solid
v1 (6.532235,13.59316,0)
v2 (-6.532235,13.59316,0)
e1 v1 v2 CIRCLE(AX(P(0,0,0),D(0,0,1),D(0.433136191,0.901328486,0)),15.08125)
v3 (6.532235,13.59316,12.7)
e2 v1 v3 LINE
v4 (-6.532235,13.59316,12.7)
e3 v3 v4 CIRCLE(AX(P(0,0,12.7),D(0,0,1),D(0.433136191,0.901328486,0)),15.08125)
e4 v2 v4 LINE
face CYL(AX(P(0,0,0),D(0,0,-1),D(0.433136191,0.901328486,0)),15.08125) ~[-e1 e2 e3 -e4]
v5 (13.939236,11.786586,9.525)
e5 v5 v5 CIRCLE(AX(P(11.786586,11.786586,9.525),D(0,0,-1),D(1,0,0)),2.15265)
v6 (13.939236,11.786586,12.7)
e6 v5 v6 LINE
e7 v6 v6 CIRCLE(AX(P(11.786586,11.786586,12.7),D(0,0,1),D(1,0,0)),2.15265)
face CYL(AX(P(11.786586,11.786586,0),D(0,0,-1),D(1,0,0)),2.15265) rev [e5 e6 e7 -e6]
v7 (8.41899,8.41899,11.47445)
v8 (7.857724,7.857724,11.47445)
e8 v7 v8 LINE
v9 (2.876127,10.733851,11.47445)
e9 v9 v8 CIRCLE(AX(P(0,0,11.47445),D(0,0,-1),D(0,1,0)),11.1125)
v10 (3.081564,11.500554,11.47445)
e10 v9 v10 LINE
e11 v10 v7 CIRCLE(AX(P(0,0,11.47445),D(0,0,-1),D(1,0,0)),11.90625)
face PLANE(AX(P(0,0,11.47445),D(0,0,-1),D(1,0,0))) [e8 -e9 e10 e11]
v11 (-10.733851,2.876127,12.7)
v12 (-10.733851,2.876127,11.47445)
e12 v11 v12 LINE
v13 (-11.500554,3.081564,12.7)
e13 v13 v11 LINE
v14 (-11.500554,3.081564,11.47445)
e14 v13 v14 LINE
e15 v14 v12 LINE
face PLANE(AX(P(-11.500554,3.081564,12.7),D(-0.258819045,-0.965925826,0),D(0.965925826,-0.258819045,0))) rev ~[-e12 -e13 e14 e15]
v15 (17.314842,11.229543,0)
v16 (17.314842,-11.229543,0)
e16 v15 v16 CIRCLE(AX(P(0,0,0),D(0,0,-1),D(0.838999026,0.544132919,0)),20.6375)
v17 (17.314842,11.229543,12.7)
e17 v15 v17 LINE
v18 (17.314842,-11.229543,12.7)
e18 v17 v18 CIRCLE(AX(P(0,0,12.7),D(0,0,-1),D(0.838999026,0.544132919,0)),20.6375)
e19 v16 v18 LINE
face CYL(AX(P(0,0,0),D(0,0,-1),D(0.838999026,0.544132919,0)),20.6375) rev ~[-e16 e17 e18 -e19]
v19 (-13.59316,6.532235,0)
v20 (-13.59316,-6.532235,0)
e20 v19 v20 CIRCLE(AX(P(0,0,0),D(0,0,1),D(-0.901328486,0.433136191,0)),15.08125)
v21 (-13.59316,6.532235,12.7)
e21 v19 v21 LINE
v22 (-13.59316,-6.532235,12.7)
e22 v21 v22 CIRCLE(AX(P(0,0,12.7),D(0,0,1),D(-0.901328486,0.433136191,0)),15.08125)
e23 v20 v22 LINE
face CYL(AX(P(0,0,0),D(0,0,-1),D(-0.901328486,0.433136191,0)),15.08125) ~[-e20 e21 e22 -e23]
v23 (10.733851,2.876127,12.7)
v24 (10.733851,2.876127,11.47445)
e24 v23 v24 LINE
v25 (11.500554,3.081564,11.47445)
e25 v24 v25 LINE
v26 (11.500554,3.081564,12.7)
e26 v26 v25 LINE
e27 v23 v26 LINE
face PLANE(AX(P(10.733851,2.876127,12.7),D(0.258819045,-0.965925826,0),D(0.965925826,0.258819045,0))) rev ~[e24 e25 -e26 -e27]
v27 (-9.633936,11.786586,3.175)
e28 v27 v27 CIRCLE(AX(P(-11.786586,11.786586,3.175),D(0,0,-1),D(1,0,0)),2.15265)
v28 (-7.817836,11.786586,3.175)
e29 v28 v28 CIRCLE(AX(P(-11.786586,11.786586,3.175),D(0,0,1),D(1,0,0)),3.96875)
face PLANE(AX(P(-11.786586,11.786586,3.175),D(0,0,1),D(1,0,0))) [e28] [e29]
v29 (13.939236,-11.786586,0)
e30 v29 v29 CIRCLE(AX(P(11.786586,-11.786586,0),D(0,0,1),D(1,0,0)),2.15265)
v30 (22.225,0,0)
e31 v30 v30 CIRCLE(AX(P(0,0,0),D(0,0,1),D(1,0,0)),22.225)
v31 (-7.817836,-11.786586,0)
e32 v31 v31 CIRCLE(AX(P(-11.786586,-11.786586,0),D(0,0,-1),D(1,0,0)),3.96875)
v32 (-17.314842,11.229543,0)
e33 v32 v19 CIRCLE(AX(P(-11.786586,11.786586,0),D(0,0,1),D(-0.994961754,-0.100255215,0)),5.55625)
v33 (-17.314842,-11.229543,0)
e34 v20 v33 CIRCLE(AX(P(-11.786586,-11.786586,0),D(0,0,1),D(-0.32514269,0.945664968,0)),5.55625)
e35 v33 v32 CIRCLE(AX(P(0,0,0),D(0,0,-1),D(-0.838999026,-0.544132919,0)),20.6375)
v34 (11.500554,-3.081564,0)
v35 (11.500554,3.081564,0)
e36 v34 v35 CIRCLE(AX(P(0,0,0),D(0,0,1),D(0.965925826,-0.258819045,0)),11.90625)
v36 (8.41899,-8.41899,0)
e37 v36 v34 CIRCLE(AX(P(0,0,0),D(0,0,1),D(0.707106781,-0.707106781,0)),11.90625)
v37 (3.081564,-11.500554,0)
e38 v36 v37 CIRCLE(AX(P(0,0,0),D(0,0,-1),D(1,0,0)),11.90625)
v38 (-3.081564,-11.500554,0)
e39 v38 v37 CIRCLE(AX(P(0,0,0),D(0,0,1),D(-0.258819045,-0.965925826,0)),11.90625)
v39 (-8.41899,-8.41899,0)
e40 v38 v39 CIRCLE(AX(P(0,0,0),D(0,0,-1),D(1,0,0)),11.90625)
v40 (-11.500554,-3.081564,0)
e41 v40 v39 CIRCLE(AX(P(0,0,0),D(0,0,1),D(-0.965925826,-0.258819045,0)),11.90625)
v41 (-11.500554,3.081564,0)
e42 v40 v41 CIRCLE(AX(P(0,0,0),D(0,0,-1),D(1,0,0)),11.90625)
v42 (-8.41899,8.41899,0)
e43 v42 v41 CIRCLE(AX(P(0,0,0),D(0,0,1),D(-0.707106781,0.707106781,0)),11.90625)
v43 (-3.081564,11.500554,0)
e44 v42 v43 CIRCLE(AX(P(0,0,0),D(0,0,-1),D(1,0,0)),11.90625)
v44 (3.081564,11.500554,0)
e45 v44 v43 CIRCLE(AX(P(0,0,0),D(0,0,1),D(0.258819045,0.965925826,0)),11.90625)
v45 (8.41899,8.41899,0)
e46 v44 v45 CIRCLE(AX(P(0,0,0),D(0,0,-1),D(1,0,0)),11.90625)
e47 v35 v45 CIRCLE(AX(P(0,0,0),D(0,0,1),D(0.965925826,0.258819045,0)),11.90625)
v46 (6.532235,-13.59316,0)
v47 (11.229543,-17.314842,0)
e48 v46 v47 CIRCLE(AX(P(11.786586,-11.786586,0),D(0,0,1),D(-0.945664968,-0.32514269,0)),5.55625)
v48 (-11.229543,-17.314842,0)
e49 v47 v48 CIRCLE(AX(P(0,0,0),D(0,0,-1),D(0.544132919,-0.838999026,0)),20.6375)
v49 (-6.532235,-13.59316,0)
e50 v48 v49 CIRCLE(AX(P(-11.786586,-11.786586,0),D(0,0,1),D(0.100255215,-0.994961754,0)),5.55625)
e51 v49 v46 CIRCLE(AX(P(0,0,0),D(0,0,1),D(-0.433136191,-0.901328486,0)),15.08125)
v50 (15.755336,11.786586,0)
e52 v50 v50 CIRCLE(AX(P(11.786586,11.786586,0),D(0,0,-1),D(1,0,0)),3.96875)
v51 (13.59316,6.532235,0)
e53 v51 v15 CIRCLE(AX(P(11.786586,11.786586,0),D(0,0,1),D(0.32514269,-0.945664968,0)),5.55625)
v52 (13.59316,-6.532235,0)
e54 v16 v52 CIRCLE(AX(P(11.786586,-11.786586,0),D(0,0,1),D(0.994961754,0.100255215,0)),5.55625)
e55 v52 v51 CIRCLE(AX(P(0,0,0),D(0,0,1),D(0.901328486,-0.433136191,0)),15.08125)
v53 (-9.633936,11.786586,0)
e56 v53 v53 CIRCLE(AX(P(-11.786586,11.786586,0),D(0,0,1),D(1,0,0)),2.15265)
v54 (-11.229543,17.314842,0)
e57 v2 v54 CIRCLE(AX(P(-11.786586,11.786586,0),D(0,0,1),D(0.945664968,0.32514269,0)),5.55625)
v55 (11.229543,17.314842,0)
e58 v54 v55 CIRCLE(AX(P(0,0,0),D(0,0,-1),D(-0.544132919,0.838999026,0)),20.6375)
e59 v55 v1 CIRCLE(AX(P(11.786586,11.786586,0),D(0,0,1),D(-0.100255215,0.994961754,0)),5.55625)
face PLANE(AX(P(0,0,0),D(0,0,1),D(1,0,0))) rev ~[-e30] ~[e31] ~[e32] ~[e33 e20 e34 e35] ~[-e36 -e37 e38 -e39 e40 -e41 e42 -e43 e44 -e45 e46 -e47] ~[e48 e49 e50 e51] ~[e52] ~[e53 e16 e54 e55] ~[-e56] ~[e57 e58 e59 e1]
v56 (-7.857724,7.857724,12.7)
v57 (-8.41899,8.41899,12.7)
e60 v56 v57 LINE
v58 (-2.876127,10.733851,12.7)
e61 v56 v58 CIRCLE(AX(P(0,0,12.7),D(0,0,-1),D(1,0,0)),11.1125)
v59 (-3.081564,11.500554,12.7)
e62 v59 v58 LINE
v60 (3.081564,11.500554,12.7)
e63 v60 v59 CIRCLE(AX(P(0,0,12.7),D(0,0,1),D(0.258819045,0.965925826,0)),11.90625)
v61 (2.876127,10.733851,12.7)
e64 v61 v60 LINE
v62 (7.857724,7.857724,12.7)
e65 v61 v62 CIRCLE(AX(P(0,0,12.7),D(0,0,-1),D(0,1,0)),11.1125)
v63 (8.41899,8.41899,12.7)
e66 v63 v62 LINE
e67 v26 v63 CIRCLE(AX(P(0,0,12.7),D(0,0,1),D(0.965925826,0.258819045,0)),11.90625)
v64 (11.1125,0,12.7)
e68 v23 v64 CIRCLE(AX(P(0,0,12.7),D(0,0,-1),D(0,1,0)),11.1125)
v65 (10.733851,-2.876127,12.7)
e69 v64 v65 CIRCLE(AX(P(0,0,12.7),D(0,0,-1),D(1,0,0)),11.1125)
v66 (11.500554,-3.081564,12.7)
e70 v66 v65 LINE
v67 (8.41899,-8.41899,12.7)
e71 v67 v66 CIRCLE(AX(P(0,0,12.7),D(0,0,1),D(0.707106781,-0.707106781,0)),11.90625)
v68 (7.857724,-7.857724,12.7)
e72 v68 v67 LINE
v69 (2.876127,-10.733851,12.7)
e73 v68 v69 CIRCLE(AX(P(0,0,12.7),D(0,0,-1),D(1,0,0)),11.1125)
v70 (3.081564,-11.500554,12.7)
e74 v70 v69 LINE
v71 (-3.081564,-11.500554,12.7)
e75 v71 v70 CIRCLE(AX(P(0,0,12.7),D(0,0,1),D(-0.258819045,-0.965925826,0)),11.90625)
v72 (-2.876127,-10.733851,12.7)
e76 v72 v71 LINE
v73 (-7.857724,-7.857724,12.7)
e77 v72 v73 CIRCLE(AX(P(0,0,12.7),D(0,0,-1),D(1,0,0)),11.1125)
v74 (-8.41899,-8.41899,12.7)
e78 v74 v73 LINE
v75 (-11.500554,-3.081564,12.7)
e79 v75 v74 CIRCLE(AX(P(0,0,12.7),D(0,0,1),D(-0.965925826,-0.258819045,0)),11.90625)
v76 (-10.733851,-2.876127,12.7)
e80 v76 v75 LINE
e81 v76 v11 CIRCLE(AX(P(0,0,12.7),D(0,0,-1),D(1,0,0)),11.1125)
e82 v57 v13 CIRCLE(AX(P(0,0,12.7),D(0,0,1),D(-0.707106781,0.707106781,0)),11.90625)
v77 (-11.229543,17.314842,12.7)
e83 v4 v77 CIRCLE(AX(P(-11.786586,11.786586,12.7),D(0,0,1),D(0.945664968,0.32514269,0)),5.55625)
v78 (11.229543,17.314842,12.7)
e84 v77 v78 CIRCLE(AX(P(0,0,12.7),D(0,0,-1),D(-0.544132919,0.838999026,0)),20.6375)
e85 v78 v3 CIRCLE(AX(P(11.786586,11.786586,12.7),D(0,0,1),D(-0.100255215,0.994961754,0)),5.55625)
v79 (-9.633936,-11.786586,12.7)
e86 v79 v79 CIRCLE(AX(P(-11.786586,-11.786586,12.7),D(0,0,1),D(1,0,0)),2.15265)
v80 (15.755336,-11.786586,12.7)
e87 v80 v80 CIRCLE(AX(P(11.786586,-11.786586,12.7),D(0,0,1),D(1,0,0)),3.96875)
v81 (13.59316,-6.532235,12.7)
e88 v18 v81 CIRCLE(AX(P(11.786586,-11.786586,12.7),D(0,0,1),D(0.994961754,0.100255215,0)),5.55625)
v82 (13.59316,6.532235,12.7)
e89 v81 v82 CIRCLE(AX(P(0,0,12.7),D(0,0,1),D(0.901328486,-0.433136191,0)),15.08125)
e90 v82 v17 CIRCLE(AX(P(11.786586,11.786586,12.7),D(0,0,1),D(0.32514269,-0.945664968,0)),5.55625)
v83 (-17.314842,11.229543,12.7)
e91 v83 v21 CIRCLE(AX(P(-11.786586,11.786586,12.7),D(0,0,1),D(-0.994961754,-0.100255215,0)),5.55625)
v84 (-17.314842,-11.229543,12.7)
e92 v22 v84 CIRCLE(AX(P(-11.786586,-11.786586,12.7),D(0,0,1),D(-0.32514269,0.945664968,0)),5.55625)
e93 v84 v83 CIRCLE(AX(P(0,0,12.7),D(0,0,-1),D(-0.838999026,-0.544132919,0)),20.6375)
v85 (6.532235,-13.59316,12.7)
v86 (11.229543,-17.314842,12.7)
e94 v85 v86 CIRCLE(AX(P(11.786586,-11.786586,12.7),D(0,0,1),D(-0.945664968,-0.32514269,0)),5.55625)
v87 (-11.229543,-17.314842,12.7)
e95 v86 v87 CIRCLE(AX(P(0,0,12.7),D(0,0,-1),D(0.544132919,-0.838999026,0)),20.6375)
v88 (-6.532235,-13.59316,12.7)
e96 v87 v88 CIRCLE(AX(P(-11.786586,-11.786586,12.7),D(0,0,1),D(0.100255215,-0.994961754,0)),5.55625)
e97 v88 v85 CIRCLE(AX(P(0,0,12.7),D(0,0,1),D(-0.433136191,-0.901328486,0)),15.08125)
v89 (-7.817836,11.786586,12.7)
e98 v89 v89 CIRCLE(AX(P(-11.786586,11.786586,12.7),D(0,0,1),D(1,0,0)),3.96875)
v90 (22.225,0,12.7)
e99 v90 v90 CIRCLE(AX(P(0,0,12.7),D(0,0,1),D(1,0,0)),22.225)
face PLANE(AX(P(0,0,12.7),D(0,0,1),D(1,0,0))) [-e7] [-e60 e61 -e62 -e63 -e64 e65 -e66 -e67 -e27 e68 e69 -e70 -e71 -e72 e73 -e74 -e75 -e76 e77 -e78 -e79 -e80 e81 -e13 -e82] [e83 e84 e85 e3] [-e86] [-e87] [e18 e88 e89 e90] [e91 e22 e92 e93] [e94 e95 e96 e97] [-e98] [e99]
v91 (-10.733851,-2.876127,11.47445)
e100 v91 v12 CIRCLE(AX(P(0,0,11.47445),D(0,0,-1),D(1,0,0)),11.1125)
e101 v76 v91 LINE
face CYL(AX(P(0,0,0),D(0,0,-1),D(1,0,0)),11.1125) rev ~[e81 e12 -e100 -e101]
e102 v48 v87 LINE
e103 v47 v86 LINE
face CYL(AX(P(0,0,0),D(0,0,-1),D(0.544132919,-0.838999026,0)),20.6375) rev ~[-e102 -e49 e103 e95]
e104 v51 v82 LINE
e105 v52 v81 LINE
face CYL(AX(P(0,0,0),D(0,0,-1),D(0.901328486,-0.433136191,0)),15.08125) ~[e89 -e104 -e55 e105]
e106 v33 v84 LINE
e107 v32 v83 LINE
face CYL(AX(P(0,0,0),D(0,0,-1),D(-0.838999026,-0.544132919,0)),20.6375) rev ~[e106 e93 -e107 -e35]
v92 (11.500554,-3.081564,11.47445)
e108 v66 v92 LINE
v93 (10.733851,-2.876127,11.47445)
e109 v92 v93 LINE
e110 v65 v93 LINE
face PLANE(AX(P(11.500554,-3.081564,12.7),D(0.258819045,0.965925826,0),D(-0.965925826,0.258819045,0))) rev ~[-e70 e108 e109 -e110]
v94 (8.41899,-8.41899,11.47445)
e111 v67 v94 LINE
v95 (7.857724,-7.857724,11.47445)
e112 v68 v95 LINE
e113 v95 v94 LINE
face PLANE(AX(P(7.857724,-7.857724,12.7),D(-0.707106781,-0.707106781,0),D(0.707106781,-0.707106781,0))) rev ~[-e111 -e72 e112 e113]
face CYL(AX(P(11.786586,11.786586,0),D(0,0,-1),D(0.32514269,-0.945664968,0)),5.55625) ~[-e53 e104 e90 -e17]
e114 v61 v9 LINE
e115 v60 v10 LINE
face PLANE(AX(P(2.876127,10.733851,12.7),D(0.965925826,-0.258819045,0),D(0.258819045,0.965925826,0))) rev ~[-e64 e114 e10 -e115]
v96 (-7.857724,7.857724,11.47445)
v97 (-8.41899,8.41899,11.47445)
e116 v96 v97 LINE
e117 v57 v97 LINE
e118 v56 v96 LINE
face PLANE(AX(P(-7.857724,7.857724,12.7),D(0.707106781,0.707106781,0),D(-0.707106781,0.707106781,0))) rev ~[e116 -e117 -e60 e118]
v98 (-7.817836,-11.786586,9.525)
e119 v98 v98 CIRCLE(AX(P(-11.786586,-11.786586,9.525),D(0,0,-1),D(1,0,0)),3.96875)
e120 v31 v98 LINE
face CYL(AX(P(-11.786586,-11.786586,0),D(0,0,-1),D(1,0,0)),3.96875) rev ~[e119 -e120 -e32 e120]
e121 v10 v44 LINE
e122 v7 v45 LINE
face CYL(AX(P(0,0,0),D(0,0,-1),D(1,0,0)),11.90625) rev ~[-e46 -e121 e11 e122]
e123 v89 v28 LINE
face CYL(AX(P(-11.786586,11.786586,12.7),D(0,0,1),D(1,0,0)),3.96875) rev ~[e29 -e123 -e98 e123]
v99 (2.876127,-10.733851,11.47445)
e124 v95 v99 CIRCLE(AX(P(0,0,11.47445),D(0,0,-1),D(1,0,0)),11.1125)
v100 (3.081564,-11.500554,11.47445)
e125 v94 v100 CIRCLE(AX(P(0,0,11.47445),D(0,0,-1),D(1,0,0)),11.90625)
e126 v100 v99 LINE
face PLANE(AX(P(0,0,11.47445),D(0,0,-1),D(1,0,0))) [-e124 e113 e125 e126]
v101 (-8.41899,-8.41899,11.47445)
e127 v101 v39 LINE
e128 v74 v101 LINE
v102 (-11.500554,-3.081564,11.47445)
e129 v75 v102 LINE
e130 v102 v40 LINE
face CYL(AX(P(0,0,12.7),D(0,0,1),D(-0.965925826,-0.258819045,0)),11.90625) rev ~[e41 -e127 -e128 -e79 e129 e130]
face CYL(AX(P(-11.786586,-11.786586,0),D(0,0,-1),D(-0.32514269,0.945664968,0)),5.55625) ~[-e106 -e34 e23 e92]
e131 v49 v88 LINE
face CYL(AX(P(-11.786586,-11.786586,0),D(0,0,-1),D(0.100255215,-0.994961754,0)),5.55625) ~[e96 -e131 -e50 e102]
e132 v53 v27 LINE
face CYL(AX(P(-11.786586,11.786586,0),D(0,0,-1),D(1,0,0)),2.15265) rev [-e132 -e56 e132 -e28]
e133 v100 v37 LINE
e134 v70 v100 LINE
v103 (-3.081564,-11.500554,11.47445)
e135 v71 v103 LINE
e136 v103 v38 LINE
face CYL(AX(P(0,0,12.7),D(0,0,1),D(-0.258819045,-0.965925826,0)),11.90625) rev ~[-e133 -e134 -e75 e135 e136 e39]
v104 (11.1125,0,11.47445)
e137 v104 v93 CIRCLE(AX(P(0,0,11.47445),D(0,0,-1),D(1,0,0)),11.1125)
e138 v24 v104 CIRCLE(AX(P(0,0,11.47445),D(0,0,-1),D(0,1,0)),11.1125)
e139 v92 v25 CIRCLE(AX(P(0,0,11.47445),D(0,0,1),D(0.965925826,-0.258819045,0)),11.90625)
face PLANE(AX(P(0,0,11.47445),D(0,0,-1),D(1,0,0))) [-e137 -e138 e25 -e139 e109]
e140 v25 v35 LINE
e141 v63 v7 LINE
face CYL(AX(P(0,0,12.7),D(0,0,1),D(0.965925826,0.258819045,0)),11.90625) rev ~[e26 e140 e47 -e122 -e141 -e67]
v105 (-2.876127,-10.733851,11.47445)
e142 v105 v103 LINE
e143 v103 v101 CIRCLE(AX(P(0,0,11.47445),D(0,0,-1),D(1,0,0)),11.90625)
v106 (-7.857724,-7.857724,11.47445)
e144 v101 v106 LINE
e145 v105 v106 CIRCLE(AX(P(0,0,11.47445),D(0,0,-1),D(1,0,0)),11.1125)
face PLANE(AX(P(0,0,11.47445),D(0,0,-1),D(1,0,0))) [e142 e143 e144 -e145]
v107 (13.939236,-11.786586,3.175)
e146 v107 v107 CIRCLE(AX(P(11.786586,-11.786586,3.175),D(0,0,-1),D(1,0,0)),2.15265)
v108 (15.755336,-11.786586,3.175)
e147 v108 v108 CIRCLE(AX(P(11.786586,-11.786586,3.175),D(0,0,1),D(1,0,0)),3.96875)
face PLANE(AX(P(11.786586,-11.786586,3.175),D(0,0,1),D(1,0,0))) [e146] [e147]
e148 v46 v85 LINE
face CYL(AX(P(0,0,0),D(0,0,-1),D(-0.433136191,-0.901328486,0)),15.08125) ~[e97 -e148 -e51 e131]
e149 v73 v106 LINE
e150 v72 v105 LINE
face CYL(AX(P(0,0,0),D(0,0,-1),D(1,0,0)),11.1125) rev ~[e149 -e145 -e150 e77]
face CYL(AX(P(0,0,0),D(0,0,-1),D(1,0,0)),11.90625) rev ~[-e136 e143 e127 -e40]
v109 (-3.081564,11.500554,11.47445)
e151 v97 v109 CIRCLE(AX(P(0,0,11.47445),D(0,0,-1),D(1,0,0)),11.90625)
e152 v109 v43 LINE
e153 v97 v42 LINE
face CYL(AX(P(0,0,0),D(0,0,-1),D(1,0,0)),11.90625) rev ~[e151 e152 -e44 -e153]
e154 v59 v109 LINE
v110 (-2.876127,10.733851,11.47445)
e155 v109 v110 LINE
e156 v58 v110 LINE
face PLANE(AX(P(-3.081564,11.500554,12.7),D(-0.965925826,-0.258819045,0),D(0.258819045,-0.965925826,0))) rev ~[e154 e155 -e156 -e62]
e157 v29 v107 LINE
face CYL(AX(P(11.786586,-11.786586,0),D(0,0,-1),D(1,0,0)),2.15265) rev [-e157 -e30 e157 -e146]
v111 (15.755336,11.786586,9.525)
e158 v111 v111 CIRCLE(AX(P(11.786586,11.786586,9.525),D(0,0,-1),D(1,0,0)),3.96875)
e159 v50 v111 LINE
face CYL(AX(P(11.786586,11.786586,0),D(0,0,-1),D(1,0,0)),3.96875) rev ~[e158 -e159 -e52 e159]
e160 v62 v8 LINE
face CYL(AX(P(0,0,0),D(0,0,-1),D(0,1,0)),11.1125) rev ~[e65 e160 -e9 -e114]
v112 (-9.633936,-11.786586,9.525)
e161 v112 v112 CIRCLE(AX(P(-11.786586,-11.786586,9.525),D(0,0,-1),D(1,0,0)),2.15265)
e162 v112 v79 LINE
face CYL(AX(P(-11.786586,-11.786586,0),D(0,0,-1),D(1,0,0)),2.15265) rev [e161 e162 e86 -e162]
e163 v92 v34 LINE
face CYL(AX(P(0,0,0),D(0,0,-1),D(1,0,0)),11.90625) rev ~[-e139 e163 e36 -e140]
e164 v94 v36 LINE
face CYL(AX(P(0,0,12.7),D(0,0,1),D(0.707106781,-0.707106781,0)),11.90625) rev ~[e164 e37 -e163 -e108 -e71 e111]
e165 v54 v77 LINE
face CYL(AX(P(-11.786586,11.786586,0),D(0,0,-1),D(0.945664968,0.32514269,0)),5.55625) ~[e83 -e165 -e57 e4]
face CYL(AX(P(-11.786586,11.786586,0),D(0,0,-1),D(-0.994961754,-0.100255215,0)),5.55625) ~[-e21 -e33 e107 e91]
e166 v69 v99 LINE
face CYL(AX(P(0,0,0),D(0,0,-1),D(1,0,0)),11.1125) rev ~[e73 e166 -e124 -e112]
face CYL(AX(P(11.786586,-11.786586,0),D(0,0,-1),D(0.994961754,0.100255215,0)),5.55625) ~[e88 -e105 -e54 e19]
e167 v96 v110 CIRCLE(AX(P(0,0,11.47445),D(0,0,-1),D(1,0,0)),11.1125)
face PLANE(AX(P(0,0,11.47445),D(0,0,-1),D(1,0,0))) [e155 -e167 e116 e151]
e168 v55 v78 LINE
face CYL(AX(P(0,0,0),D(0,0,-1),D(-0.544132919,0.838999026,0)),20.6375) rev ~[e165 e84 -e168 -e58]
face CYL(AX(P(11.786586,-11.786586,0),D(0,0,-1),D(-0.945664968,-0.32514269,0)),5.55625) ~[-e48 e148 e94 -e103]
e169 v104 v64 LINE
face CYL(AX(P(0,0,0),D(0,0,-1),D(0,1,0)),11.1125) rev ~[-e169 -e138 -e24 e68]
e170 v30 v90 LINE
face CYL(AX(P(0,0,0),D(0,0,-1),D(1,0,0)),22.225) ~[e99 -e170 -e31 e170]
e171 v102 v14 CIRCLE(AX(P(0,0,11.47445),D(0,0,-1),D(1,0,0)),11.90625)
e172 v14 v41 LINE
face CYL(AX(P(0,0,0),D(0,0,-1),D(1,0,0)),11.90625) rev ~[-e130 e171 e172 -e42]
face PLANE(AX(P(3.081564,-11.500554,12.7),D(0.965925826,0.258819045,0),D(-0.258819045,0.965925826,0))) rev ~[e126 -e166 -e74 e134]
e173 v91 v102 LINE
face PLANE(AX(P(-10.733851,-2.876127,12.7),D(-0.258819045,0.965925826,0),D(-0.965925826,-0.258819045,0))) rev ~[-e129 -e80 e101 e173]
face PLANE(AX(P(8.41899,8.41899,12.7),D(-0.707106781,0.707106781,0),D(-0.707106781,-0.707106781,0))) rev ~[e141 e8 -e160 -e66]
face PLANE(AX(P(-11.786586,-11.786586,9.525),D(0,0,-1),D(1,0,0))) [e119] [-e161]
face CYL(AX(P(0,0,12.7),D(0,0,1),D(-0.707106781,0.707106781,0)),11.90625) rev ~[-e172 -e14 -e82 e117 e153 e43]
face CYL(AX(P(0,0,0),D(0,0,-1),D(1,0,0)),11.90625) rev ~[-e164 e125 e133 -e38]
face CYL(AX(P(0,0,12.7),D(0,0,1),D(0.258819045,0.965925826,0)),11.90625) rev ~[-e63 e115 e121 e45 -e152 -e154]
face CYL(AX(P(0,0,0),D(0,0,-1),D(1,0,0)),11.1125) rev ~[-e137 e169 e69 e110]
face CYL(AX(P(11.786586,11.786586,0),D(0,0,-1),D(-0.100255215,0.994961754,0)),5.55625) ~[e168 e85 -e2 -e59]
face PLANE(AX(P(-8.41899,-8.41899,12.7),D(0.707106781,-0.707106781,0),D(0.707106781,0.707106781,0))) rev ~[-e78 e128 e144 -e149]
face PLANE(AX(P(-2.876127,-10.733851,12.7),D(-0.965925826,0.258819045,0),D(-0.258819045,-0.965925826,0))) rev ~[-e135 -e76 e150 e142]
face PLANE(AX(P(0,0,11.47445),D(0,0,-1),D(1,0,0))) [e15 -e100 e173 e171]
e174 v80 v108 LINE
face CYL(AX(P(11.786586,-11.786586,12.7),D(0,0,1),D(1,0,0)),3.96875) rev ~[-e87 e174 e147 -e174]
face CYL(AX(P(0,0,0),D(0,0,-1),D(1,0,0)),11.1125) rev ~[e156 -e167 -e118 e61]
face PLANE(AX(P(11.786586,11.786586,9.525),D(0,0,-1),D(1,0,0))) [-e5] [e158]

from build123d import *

# Parameters (mm, degrees)
F0_R             = 22.225
F0_R_2           = 2.15265
F1_DEPTH         = 12.7
F3_DEPTH         = 12.7
F4_COUNT         = 6
F4_ANGLE         = 300
F6_R             = 11.90625
F7_DEPTH         = 11.47445
F10_R            = 3.96875
F11_DEPTH        = 9.525
F12_R            = 3.96875
F13_DEPTH        = 9.525
F15_DEPTH        = 12.7
F15_COPIES_COUNT = 4


# Not quite as in the source:
# - a pattern or mirror of a feature is missing from the dataset's text; its kind, count and spacing are read off the source's solid


with BuildPart() as f1:
    # F0 (on Top) → F1 (new body)
    with BuildSketch(Plane.XY):
        Circle(F0_R)
        with Locations((-11.7865861589, -11.7865861589)):
            Circle(F0_R_2, mode=Mode.SUBTRACT)
        with Locations((11.7865861589, -11.7865861589)):
            Circle(F0_R_2, mode=Mode.SUBTRACT)
        with Locations((-11.7865861589, 11.7865861589)):
            Circle(F0_R_2, mode=Mode.SUBTRACT)
        with BuildLine():
            ThreePointArc((0, 11.1125), (7.8577241059, 7.8577241059), (11.1125, 0))
            ThreePointArc((11.1125, 0), (-7.8577241059, -7.8577241059), (0, 11.1125))
        make_face(mode=Mode.SUBTRACT)
        with Locations((11.7865861589, 11.7865861589)):
            Circle(F0_R_2, mode=Mode.SUBTRACT)
    extrude(amount=F1_DEPTH)

    # F2 (on face) → F3 (cut, through all)
    with BuildSketch(Plane.XY.offset(12.7)):
        with BuildLine():
            ThreePointArc((-2.8761266387, 10.7338507446), (0, 11.1125), (2.8761266387, 10.7338507446))
            Line((2.8761266387, 10.7338507446), (3.0815642558, 11.5005543693))
            ThreePointArc((3.0815642558, 11.5005543693), (0, 11.90625), (-3.0815642558, 11.5005543693))
            Line((-3.0815642558, 11.5005543693), (-2.8761266387, 10.7338507446))
        make_face()
    f3 = extrude(amount=-F3_DEPTH, mode=Mode.SUBTRACT)

    # F4: F3 ×6 about axis
    f4_axis = Axis((0, 0, 0), (0, 0, -1))
    for i in range(1, F4_COUNT):
        add(f3.rotate(f4_axis, i * F4_ANGLE / (F4_COUNT - 1)), mode=Mode.SUBTRACT)

    # F6 (on face) → F7 (cut, through all)
    with BuildSketch(Plane(origin=(0, 0, 0), x_dir=(1, 0, 0), z_dir=(0, 0, -1))):
        Circle(F6_R)
    extrude(amount=-F7_DEPTH, mode=Mode.SUBTRACT)

    # F10 (on face) → F11 (cut, through all)
    with BuildSketch(Plane(origin=(0, 0, 0), x_dir=(1, 0, 0), z_dir=(0, 0, -1))):
        with Locations((11.7865861589, -11.7865861589)):
            Circle(F10_R)
        with Locations((-11.7865861589, 11.7865861589)):
            Circle(F10_R)
    extrude(amount=-F11_DEPTH, mode=Mode.SUBTRACT)

    # F12 (on face) → F13 (cut, through all)
    with BuildSketch(Plane.XY.offset(12.7)):
        with Locations((-11.7865861589, 11.7865861589)):
            Circle(F12_R)
        with Locations((11.7865861589, -11.7865861589)):
            Circle(F12_R)
    extrude(amount=-F13_DEPTH, mode=Mode.SUBTRACT)

    # F14 (on face) → F15 (cut, through all)
    with BuildSketch(Plane(origin=(0, 0, 0), x_dir=(1, 0, 0), z_dir=(0, 0, -1))):
        with BuildLine():
            ThreePointArc((-11.229543123, 17.3148424047), (-8.3361072587, 16.1415958514), (-6.5322351826, 13.5931602316))
            ThreePointArc((-6.5322351826, 13.5931602316), (0, 15.08125), (6.5322351826, 13.5931602316))
            ThreePointArc((6.5322351826, 13.5931602316), (8.3361072587, 16.1415958514), (11.229543123, 17.3148424047))
            ThreePointArc((11.229543123, 17.3148424047), (0, 20.6375), (-11.229543123, 17.3148424047))
        make_face()
    f15 = extrude(amount=-F15_DEPTH, mode=Mode.SUBTRACT)

    # F15_copies: F15 ×4 about axis
    f15_copies_axis = Axis((0, 0, 0), (0, 0, 1))
    for i in range(1, F15_COPIES_COUNT):
        add(f15.rotate(f15_copies_axis, i * 360 / F15_COPIES_COUNT), mode=Mode.SUBTRACT)


solid = f1.part
